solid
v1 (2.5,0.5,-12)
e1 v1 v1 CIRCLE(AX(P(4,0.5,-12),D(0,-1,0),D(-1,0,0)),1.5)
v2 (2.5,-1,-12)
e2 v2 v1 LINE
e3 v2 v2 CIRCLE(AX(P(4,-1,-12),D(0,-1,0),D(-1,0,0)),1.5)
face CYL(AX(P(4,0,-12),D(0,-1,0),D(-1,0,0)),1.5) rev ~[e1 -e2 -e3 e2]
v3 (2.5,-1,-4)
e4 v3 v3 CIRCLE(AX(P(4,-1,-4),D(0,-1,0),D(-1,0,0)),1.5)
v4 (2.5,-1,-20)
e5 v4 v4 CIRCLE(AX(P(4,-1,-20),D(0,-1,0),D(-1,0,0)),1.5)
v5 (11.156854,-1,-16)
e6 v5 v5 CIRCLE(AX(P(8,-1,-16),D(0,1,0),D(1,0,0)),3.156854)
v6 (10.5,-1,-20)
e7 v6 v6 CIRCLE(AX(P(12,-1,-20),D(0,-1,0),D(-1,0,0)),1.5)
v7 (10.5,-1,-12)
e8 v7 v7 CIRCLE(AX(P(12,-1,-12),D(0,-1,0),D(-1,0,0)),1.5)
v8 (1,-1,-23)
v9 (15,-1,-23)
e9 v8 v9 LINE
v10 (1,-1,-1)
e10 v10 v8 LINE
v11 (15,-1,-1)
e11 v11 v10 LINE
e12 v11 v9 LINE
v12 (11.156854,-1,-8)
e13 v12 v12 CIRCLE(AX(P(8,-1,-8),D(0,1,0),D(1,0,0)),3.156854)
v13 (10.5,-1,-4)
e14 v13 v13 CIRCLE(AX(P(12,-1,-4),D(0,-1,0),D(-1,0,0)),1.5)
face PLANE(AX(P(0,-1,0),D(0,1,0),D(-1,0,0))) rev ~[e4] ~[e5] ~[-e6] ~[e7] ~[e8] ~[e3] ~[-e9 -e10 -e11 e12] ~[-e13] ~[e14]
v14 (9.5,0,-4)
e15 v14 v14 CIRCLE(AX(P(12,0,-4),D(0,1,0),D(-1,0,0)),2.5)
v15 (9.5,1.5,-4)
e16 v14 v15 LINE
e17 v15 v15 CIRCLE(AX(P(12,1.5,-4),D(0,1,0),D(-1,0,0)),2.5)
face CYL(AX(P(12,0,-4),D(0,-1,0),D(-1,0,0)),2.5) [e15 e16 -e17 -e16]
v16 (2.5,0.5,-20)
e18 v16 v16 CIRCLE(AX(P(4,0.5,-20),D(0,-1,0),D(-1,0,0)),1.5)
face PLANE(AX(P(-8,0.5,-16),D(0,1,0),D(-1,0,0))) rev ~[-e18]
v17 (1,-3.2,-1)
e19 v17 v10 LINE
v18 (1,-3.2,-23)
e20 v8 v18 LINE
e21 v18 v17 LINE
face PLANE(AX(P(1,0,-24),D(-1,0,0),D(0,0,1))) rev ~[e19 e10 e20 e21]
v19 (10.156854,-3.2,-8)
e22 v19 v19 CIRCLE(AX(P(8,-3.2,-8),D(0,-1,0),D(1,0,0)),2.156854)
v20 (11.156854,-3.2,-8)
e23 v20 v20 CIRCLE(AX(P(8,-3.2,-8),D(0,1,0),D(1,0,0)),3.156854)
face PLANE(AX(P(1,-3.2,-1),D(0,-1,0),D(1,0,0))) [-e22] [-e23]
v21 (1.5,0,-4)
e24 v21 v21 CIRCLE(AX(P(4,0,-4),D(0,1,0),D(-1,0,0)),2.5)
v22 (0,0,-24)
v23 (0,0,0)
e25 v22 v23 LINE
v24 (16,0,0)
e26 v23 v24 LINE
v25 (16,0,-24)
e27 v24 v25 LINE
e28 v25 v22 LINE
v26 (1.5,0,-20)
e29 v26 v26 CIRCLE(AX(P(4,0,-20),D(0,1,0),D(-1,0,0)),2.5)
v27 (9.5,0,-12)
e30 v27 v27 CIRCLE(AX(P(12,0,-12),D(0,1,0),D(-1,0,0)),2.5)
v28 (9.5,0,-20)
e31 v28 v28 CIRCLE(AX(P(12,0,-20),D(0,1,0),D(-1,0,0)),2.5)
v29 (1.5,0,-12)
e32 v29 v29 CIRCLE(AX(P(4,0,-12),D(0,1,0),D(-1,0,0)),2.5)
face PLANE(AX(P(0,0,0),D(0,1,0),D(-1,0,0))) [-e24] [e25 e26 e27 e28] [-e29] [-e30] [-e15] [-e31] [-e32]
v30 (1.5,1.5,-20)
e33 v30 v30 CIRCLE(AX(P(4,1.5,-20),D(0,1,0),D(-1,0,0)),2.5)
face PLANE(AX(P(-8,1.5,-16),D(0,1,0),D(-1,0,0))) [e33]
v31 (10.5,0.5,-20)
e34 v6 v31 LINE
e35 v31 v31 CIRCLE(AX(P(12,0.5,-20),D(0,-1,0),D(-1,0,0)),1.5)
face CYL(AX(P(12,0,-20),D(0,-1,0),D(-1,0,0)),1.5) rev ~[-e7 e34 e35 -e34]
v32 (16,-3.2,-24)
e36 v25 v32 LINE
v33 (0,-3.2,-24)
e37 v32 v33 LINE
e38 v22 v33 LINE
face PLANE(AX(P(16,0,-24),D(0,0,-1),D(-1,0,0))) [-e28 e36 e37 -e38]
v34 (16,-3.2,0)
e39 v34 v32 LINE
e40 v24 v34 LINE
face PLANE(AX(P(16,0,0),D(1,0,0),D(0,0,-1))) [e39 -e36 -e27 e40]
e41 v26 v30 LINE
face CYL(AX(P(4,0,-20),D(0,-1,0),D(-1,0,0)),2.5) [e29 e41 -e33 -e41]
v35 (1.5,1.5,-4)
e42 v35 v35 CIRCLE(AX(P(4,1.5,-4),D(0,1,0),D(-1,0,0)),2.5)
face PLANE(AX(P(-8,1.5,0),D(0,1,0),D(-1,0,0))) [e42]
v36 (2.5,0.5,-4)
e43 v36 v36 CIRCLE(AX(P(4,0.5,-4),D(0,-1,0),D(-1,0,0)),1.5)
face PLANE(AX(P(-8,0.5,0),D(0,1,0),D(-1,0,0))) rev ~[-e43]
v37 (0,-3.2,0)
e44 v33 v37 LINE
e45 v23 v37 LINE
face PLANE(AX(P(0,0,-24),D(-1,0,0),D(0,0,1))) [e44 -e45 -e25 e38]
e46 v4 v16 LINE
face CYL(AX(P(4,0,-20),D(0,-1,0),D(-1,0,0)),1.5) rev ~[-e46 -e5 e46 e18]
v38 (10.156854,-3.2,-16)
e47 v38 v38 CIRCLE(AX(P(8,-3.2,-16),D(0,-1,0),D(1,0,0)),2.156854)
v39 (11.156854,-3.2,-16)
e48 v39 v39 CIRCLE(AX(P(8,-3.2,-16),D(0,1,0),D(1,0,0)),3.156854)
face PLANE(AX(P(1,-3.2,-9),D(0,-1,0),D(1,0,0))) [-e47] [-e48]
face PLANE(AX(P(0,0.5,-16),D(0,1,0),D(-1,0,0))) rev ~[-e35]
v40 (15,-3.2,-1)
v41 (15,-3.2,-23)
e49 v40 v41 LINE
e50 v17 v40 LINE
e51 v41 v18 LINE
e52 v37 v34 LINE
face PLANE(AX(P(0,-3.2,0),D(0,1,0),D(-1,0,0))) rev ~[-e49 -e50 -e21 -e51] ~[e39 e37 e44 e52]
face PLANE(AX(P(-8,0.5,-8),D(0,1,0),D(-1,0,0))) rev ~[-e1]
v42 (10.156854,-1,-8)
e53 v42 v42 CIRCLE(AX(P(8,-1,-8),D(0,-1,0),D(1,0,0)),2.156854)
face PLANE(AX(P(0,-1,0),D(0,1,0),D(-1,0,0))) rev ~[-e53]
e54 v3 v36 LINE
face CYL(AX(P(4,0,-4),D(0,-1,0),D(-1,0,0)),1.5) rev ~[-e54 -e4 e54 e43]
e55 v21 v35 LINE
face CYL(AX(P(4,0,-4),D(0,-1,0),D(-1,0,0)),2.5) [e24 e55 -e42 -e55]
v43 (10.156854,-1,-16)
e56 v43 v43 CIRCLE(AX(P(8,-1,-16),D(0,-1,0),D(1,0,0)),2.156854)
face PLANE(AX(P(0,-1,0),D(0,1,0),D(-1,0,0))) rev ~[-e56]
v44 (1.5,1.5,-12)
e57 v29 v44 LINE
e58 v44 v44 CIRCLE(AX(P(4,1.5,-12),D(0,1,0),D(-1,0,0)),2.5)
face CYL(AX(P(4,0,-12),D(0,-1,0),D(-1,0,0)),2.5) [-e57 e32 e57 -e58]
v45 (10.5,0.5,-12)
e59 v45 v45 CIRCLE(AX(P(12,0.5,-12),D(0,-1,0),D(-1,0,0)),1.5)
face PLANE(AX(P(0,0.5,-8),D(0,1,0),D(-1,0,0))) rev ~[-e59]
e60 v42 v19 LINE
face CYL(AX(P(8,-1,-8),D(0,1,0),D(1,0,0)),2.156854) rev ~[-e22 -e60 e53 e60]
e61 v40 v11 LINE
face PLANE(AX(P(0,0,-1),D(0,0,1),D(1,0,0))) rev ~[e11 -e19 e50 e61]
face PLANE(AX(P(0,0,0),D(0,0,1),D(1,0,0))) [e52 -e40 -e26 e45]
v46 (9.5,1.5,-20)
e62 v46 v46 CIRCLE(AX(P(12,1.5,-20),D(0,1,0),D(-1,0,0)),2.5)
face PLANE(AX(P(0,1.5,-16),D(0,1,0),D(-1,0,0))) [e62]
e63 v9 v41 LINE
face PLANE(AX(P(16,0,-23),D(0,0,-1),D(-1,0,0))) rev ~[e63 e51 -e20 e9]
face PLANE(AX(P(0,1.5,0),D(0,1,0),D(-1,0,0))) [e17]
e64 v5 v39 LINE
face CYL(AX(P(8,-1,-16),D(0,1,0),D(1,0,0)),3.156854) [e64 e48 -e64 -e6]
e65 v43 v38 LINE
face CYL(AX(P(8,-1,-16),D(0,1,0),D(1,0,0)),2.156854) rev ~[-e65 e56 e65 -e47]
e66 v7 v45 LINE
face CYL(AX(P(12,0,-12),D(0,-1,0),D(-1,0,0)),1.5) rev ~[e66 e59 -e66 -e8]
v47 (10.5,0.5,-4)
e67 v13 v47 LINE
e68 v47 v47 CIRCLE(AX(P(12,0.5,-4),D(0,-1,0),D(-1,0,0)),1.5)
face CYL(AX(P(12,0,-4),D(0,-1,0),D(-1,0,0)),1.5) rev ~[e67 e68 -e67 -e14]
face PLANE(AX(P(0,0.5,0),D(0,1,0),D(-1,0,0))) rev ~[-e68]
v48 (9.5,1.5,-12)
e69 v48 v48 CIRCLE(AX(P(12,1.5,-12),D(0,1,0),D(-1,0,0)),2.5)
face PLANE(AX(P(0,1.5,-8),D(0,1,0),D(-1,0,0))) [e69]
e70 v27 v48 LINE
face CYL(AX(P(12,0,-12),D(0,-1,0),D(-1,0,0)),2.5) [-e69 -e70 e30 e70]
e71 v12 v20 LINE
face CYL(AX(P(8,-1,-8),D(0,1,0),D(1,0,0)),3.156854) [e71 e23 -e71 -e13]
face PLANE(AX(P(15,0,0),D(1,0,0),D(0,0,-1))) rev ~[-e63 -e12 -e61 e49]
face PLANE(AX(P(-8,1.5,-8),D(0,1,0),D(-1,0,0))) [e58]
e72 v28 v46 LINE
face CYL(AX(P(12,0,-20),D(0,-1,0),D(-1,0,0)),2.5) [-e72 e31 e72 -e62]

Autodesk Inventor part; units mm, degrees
ref_plane "YZ Plane" through (0, 0, 0) normal (1, 0, 0) x (0, 1, 0)
ref_plane "XZ Plane" through (0, 0, 0) normal (0, 1, 0) x (-1, 0, 0)
ref_plane "XY Plane" through (0, 0, 0) normal (0, 0, 1) x (1, 0, 0)
sketch "草圖1" plane through (0, 0, 0) normal (0, 1, 0) x (-1, 0, 0)
  line L0 (0, 0) -> (-16, 0)
  line L1 (-16, 0) -> (-16, -24)
  line L2 (-16, -24) -> (0, -24)
  line L3 (0, -24) -> (0, 0)
  dimension "長" = 16
  dimension "寬" = 24
extrude "樂高擠出" add sketch "草圖1" against normal blind 3.2
sketch "草圖2" plane through (0, 0, 0) normal (0, 1, 0) x (-1, 0, 0)
  circle A0 centre (-12, -4) radius 2.5
  line L0 (-16, 0) -> (-16, -24) projected
  line L1 (0, 0) -> (-16, 0) projected
  dimension "d4" = 5
  dimension "d5" = 4
  dimension "d6" = 4
extrude "圓柱擠出" add sketch "草圖2" along normal blind 1.5
pattern_linear "頂部圓柱" count 3 spacing 8 along (0, 0, -1) count 2 spacing 8 along (-1, 0, 0) of "圓柱擠出"
shell "薄殼2" thickness 1 removed faces 1 at (10.666667, -3.2, -16)
sketch "草圖6" plane through (1, -1, -1) normal (0, -1, 0) x (1, 0, 0)
  circle A0 centre (3, -19) radius 1.5
  circle A1 centre (3, -11) radius 1.5
  circle A2 centre (3, -3) radius 1.5
  circle A3 centre (11, -19) radius 1.5
  circle A4 centre (11, -11) radius 1.5
  circle A5 centre (11, -3) radius 1.5
  line L0 (14, 0) -> (14, -22)
  line L1 (0, 0) -> (14, 0)
  line L2 (0, -22) -> (0, 0)
  line L3 (14, -22) -> (0, -22)
  circle A6 centre (7, -7) radius 3.156854
  circle A7 centre (11, -11) radius 2.5
  circle A8 centre (11, -3) radius 2.5
  circle A9 centre (3, -3) radius 2.5
  circle A10 centre (7, -7) radius 2.156854
  point P0 (-1, 1)
  dimension "d41" = 1
extrude "擠出7" add sketch "草圖6" along normal up to surface (2.2 mm away) contours A6
pattern_linear "矩形陣列3" count 2 spacing 8 along (0, 0, -1) of "擠出7"
properties part number "0401_練習"
